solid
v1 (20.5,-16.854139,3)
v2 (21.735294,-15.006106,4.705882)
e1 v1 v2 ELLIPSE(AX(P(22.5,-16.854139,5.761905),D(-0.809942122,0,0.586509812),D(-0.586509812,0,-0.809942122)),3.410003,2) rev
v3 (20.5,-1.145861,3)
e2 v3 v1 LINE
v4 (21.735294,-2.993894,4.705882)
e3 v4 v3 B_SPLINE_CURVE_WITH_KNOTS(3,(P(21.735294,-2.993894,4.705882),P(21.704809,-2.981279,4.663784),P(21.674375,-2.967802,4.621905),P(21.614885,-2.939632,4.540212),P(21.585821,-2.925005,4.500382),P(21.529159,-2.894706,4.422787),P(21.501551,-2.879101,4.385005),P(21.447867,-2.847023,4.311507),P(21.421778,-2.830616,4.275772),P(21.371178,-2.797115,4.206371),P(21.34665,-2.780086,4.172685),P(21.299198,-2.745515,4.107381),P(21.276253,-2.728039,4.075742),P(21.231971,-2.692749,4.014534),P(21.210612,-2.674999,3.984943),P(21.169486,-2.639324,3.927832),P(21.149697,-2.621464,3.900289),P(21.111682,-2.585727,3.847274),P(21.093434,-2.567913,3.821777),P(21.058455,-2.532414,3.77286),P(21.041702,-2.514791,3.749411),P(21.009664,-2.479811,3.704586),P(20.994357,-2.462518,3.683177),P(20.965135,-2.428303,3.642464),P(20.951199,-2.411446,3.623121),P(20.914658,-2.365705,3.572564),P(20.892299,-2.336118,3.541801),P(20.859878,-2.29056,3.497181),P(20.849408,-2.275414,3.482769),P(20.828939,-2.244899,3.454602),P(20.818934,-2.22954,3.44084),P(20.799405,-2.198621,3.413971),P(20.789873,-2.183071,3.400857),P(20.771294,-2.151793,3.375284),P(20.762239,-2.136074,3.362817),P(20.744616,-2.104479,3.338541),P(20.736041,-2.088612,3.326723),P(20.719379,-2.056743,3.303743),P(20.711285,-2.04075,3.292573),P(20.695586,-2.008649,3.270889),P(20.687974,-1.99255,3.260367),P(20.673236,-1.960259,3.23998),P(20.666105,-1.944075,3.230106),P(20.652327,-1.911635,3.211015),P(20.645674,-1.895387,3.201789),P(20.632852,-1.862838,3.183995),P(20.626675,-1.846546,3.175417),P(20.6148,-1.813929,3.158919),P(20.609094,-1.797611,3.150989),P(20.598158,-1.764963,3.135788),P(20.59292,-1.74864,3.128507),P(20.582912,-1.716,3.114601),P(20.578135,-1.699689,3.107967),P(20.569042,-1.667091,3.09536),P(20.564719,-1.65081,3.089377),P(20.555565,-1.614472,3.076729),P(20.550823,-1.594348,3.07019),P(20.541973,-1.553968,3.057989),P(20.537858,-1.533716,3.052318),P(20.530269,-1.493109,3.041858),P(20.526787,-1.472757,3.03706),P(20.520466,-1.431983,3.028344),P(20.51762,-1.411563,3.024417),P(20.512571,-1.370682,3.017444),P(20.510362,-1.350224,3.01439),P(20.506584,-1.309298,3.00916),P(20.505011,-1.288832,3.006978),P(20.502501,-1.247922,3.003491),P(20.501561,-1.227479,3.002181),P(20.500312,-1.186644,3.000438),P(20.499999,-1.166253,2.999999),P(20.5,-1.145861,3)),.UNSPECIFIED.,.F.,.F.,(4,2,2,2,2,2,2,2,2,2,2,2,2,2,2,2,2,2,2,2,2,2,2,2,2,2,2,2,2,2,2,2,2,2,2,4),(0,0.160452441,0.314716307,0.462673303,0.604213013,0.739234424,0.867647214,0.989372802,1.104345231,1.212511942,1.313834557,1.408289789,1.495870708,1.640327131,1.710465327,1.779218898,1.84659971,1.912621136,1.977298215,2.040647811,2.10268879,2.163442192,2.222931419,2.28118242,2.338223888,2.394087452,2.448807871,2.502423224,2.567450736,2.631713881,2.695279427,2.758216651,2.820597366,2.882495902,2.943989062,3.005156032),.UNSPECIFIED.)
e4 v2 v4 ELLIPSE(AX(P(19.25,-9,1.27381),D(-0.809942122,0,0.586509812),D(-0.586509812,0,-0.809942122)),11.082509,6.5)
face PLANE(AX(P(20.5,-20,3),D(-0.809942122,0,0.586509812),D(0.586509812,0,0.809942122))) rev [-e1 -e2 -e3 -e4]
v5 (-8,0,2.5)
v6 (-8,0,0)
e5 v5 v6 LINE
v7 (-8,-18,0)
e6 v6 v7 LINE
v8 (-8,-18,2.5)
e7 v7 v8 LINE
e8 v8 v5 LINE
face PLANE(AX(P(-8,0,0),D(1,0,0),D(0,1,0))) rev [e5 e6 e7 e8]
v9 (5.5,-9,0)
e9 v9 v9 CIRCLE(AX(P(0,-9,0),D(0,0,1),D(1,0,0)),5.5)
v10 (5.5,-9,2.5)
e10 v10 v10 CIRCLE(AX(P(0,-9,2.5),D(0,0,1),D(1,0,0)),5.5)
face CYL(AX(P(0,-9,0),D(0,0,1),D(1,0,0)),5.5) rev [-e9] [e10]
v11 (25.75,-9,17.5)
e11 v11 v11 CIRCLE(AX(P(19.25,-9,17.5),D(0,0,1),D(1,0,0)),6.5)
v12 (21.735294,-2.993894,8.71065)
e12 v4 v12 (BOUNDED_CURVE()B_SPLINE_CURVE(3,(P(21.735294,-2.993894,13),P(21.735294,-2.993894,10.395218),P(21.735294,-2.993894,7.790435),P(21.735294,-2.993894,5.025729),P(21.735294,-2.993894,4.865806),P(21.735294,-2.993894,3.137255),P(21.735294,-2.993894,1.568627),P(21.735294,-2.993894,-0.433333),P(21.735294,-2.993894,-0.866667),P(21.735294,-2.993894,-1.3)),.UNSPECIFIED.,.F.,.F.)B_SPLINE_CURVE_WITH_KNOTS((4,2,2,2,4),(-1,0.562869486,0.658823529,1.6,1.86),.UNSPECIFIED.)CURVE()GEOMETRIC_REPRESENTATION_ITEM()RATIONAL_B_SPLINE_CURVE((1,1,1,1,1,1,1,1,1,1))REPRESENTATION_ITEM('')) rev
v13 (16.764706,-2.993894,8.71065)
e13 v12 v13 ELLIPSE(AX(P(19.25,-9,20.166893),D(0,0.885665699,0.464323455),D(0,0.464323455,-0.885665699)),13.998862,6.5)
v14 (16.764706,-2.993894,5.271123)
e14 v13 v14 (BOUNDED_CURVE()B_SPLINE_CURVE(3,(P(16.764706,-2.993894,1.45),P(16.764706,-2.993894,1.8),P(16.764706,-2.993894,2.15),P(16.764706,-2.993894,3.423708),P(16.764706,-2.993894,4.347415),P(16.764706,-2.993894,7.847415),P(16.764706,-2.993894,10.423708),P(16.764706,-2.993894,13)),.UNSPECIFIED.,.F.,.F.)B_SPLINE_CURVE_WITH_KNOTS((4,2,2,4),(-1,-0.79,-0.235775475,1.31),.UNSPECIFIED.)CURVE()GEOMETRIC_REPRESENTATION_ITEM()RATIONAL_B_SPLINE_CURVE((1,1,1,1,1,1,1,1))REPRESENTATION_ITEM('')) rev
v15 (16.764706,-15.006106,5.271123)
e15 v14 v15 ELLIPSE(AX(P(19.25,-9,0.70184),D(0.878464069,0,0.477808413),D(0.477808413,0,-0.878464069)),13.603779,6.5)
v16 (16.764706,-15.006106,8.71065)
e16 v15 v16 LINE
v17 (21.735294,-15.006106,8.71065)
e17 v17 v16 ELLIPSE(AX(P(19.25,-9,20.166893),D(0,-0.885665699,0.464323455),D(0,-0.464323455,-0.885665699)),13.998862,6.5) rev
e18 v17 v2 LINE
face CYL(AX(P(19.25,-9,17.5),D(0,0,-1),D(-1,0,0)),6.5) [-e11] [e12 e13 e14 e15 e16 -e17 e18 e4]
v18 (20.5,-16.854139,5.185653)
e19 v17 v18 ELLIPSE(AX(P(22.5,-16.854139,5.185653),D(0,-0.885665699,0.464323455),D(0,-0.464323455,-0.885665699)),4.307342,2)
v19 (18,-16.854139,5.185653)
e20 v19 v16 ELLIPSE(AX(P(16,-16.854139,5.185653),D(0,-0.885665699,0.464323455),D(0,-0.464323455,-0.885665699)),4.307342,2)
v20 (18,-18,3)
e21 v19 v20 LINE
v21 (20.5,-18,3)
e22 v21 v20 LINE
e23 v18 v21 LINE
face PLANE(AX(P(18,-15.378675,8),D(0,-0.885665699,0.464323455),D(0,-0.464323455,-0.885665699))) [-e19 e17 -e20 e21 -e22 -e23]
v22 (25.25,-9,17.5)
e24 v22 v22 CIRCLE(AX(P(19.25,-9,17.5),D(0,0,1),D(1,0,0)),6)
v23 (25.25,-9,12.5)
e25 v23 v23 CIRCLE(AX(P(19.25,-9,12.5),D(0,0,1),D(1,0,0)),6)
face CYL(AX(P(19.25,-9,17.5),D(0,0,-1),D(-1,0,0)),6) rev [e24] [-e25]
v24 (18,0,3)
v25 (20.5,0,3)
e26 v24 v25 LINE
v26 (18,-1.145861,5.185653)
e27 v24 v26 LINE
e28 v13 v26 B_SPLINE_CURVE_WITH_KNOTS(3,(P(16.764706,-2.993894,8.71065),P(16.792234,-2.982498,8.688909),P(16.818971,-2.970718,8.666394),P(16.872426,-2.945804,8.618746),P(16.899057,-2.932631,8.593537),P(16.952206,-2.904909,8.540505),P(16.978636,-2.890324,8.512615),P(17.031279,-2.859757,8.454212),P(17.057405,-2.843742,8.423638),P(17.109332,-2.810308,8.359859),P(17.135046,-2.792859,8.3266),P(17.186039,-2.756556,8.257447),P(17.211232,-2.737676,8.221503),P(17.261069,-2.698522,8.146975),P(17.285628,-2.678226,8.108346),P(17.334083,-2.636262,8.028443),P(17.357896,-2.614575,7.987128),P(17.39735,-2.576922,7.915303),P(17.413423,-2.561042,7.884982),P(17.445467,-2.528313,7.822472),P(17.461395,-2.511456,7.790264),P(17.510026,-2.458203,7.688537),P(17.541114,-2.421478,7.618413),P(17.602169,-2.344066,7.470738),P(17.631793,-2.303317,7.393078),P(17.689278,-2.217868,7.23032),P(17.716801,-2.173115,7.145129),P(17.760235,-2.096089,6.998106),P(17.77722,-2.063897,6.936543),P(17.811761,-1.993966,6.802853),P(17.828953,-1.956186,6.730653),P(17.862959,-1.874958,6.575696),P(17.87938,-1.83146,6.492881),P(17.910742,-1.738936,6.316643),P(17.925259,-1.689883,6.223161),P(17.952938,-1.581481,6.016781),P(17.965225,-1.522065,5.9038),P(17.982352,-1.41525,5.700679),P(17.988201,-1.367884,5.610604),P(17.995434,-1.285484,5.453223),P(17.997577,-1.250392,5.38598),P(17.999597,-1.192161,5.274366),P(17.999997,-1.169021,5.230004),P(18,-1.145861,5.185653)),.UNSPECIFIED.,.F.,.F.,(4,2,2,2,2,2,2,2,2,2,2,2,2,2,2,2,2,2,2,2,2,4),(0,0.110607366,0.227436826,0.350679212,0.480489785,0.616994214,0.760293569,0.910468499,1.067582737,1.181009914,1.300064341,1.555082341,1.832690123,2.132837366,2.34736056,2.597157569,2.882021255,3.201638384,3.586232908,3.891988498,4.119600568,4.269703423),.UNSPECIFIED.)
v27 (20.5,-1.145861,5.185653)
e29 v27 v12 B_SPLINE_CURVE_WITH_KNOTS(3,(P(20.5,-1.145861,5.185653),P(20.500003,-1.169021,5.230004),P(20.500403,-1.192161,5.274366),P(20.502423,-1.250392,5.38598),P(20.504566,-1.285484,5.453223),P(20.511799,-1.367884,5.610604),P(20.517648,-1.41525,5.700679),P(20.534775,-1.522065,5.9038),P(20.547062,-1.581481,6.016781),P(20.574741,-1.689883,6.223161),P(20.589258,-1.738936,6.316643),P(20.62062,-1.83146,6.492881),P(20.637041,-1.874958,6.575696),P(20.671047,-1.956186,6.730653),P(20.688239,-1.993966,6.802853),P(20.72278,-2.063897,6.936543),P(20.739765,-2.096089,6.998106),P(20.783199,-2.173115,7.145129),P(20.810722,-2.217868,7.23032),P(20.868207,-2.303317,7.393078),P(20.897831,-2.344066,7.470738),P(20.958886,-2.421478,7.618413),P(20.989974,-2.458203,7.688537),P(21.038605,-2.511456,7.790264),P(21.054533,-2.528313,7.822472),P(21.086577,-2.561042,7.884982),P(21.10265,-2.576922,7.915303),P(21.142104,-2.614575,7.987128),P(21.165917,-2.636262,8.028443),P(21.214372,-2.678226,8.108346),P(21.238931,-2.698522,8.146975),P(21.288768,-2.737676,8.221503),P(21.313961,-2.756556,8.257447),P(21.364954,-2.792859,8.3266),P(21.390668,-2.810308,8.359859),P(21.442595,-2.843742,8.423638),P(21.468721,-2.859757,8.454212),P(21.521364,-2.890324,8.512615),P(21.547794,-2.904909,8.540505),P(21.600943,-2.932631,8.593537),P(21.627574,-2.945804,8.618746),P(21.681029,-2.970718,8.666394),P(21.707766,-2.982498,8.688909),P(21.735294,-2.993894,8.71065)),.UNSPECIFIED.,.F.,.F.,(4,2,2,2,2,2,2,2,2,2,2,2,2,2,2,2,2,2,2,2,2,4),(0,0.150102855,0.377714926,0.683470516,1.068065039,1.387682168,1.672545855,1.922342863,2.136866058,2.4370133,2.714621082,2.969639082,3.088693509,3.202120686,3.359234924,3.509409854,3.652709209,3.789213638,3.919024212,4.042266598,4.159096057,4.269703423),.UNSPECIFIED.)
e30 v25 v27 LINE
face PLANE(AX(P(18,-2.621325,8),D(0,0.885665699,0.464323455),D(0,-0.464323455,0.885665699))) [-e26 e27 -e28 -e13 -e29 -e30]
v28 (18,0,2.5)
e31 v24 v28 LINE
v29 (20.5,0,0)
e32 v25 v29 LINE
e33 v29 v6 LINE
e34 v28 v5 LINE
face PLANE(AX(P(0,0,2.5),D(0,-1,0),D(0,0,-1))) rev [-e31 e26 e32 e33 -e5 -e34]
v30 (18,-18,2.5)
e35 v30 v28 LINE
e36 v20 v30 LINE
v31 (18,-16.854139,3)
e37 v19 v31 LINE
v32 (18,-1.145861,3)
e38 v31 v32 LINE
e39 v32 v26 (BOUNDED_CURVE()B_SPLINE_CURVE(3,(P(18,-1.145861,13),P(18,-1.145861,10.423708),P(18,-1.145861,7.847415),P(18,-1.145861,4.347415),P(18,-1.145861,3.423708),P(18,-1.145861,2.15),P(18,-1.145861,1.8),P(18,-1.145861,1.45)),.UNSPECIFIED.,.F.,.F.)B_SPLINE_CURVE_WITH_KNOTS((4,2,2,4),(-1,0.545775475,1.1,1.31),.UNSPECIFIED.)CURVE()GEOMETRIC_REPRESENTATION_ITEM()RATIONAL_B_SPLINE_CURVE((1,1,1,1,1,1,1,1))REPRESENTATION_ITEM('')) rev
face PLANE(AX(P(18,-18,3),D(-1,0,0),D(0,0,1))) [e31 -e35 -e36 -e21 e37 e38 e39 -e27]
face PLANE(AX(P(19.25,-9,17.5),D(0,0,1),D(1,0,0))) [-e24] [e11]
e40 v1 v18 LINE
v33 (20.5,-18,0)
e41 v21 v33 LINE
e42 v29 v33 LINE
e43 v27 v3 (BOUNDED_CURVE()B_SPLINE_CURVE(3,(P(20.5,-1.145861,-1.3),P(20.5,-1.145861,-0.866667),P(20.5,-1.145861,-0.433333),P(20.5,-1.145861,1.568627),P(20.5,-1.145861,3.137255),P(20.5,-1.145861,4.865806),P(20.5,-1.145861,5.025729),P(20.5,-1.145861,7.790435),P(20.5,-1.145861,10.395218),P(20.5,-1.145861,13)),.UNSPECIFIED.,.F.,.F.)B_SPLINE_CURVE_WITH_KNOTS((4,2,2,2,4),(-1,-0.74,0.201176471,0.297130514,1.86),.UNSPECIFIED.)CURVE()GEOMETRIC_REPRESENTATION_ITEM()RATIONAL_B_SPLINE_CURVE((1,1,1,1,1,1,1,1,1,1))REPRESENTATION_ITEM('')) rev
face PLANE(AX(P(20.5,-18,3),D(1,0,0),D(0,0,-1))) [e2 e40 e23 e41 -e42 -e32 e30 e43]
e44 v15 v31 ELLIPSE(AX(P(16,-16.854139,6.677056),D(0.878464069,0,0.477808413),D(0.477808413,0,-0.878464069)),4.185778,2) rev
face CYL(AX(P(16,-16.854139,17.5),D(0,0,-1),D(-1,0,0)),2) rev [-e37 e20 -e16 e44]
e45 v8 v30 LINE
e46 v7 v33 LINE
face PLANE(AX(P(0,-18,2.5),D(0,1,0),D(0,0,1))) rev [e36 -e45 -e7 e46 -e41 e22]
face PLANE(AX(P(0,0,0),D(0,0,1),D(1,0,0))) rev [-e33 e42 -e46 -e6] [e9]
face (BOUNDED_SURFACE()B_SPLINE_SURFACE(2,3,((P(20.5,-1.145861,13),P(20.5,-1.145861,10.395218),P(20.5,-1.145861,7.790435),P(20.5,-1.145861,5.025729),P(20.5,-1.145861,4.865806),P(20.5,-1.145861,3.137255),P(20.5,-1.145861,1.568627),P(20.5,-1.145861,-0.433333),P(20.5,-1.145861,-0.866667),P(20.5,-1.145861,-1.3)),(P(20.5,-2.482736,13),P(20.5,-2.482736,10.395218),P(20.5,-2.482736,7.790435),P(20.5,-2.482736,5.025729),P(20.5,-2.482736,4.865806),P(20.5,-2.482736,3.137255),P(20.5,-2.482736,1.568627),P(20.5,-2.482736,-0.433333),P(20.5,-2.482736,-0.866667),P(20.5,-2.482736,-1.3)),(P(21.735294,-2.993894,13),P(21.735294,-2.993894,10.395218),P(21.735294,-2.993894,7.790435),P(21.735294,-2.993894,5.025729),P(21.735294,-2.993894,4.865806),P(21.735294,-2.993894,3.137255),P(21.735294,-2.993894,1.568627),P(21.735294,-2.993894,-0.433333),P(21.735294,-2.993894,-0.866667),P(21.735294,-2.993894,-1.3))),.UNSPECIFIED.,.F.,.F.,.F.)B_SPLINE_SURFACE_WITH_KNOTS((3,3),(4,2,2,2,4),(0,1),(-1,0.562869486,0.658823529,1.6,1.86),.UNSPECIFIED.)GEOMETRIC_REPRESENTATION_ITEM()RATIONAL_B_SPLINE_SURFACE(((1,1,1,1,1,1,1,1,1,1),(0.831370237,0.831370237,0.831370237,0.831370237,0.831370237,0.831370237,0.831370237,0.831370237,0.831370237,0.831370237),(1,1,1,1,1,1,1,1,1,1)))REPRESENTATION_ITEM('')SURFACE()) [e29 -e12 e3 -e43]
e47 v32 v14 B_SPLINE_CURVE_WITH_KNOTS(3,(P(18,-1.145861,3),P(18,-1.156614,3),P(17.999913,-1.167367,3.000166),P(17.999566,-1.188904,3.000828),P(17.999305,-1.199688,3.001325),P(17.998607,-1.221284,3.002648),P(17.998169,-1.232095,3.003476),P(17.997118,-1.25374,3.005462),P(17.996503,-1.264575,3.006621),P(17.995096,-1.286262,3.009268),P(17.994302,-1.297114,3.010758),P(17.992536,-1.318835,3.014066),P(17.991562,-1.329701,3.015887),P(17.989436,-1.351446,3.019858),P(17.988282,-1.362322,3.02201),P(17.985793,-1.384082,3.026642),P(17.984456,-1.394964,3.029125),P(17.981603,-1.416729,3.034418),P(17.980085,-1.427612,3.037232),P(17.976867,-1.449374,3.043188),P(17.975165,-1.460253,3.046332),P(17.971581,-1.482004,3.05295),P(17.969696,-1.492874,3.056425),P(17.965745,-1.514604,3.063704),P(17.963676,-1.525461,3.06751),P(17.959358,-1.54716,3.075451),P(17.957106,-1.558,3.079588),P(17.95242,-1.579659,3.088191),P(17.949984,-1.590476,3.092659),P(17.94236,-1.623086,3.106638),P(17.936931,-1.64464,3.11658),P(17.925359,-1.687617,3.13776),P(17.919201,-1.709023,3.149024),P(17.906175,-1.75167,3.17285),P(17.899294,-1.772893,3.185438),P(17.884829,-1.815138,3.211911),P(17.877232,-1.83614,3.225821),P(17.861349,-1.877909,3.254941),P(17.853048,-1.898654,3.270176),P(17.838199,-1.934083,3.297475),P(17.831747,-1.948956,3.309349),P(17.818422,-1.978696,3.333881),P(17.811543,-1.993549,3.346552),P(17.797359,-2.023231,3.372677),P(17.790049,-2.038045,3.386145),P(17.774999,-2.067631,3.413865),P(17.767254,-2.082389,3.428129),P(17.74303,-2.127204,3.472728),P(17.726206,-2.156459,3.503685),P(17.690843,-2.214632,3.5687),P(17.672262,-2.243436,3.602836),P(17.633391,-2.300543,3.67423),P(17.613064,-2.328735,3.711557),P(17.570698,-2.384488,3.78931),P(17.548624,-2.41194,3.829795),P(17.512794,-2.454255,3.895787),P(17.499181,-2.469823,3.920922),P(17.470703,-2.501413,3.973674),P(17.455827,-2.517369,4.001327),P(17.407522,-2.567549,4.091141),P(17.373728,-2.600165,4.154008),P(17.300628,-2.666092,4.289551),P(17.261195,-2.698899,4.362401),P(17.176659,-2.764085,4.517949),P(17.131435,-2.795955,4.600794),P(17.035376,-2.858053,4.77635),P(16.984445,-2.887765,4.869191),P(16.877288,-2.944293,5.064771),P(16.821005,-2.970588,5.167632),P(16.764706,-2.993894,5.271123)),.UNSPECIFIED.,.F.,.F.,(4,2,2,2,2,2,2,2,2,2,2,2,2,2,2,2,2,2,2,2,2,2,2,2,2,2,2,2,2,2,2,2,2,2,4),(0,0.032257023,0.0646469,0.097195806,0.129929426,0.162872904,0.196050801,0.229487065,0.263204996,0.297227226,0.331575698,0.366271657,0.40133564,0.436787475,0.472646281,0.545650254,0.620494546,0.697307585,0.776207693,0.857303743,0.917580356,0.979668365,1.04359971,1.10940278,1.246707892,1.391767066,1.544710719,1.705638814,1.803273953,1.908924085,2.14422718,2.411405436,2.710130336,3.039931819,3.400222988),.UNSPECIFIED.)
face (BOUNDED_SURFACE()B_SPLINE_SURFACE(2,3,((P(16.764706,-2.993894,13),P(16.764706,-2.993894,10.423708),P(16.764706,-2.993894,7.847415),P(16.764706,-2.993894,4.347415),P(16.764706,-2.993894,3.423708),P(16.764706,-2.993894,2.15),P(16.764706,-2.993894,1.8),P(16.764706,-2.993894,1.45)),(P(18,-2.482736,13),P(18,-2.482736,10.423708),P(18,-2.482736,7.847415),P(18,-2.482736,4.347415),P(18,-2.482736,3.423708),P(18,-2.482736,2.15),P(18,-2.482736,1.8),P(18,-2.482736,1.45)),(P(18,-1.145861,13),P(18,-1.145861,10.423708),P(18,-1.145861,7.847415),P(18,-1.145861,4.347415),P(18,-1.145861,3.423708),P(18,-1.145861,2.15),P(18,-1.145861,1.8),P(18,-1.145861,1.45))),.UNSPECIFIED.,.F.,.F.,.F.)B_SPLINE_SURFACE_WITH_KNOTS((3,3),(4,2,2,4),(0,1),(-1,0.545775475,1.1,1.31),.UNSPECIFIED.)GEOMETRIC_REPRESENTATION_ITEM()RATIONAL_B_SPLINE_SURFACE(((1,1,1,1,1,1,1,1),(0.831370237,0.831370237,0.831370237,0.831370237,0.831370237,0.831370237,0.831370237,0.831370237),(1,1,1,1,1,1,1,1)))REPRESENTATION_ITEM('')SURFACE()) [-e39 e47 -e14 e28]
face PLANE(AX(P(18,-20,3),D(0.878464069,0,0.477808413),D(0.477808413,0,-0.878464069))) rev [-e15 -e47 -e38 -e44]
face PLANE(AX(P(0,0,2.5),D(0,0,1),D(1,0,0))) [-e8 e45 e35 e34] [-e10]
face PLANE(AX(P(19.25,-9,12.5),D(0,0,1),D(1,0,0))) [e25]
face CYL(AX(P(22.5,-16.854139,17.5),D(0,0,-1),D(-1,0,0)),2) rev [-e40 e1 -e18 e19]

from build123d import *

# Parameters (mm, degrees)
SZKIC1_W                     = 18
SZKIC1_H                     = 18
DODANIE_WYCI_GNI_CIE1_DEPTH  = 2.5
SZKIC3_R                     = 6.5
SZKIC3_R_2                   = 6
DODANIE_WYCI_GNI_CIE2_DEPTH  = 5
SZKIC5_R                     = 6.5
DODANIE_WYCI_GNI_CIE3_DEPTH  = 9.5
SZKIC6_W                     = 2.5
SZKIC6_H                     = 18
DODANIE_WYCI_GNI_CIE4_DEPTH  = 3
WYTNIJ_WYCI_GNI_CIE3_DEPTH   = 20
DODANIE_WYCI_GNI_CIE11_DEPTH = 2.5
ZAOKR_GLENIE3_R              = 2
ZAOKR_GLENIE4_R              = 2
ZAOKR_GLENIE5_R              = 2
ZAOKR_GLENIE6_R              = 2
SZKIC21_W                    = 2.5
SZKIC21_H                    = 18
DODANIE_WYCI_GNI_CIE12_DEPTH = 8
SZKIC23_R                    = 5.5
WYTNIJ_WYCI_GNI_CIE4_DEPTH   = 2.5


with BuildPart() as part:
    # Szkic1 → Dodanie-wyciągnięcie1 (new body)
    with BuildSketch(Plane.XY):
        with Locations((9, -9)):
            Rectangle(SZKIC1_W, SZKIC1_H)
    extrude(amount=DODANIE_WYCI_GNI_CIE1_DEPTH)

    # Szkic6 → Dodanie-wyciągnięcie4 (add)
    with BuildSketch(Plane(origin=(0, 0, 0), x_dir=(-1, 0, 0), z_dir=(0, 0, -1))):
        with Locations((-19.25, -9)):
            Rectangle(SZKIC6_W, SZKIC6_H)
    extrude(amount=-DODANIE_WYCI_GNI_CIE4_DEPTH)



with BuildPart() as body_2:
    # Szkic3 → Dodanie-wyciągnięcie2 (new body)
    with BuildSketch(Plane.XY.offset(12.5)):
        with Locations((19.25, -9)):
            Circle(SZKIC3_R)
        with Locations((19.25, -9)):
            Circle(SZKIC3_R_2, mode=Mode.SUBTRACT)
    extrude(amount=DODANIE_WYCI_GNI_CIE2_DEPTH)

    # Szkic5 → Dodanie-wyciągnięcie3 (add)
    with BuildSketch(Plane.XY.offset(12.5)):
        with Locations((19.25, -9)):
            Circle(SZKIC5_R)
    extrude(amount=-DODANIE_WYCI_GNI_CIE3_DEPTH)

    # Szkic17 → Wytnij-wyciągnięcie3 (cut)
    with BuildSketch(Plane(origin=(0, 0, 0), x_dir=(1, 0, 0), z_dir=(0, 1, 0))):
        Polygon((20.5, -3), (25.75, -10.25), (25.75, -3), align=None)
        Polygon((18, -3), (12.696843968, -12.75), (12.75, -3), align=None)
    extrude(amount=-WYTNIJ_WYCI_GNI_CIE3_DEPTH, mode=Mode.SUBTRACT)


with BuildPart() as part_1:
    add(part.part)

    add(body_2.part)  # Dodanie-wyciągnięcie11 merges body 2
    # Szkic19 → Dodanie-wyciągnięcie11 (add)
    with BuildSketch(Plane(origin=(20.5, 0, 0), x_dir=(0, 0, -1), z_dir=(1, 0, 0))):
        Polygon((-3, -18), (-3, -15.378675411), (-8, -15.378675411), align=None)
        Polygon((-3, 0), (-3, -2.621324589), (-8, -2.621324589), align=None)
    extrude(amount=-DODANIE_WYCI_GNI_CIE11_DEPTH)

    # Zaokrąglenie3
    zaokr_glenie3_edges = [part_1.edges().sort_by_distance(p)[0] for p in [
        (20.5, -15.378675411, 5.5),
    ]]
    fillet(zaokr_glenie3_edges, radius=ZAOKR_GLENIE3_R)

    # Zaokrąglenie4
    zaokr_glenie4_edges = [part_1.edges().sort_by_distance(p)[0] for p in [
        (20.5, -2.621324589, 5.5),
    ]]
    fillet(zaokr_glenie4_edges, radius=ZAOKR_GLENIE4_R)

    # Zaokrąglenie5
    # the kernel refuses this fillet: 2 mm, written as the material it adds along each edge
    with BuildSketch(Plane(origin=(18, -15.378675411, -0.688659063), x_dir=(0, -1, 0), z_dir=(0, 0, 1))) as zaokr_glenie5_piece_1_section:
        with BuildLine():
            CenterArc((1.475463625, -2), ZAOKR_GLENIE5_R, 90, 67.520494391)
            ThreePointArc((-0.372569089, -1.235294118), (-0.155557822, -0.626914348), (0, 0))
            Line((0, 0), (1.475463625, 0))
        make_face()
    zaokr_glenie5_piece_1 = extrude(amount=12.377318126, mode=Mode.PRIVATE)
    zaokr_glenie5_piece_1 = split(zaokr_glenie5_piece_1, bisect_by=Plane(origin=(16.879667194, -15.616046578, 5.059763053), z_dir=(0.878464068971863, 0, 0.47780841299143956)), keep=Keep.TOP, mode=Mode.PRIVATE)
    zaokr_glenie5_piece_1 = split(zaokr_glenie5_piece_1, bisect_by=Plane(origin=(17.729689725, -16.448851128, 5.958711939), z_dir=(0, 0.8856656985010092, -0.46432345460758234)), keep=Keep.TOP, mode=Mode.PRIVATE)
    add(zaokr_glenie5_piece_1)

    # Zaokrąglenie6
    # the kernel refuses this fillet: 2 mm, written as the material it adds along each edge
    with BuildSketch(Plane(origin=(18, -2.621324589, -0.688659063), x_dir=(0, 1, 0), z_dir=(0, 0, 1))) as zaokr_glenie6_piece_1_section:
        with BuildLine():
            CenterArc((1.475463625, 2), ZAOKR_GLENIE6_R, 202.479505609, 67.520494391)
            ThreePointArc((-0.372569089, 1.235294118), (-0.155557822, 0.626914348), (0, 0))
            Line((0, 0), (1.475463625, 0))
        make_face()
    zaokr_glenie6_piece_1 = extrude(amount=12.377318126, mode=Mode.PRIVATE)
    zaokr_glenie6_piece_1 = split(zaokr_glenie6_piece_1, bisect_by=Plane(origin=(17.729689725, -1.551148872, 5.958711939), z_dir=(0, -0.8856656985010092, -0.4643234546075823)), keep=Keep.TOP, mode=Mode.PRIVATE)
    zaokr_glenie6_piece_1 = split(zaokr_glenie6_piece_1, bisect_by=Plane(origin=(16.879667194, -2.383953422, 5.059763053), z_dir=(0.8784640689720787, 0, 0.4778084129910428)), keep=Keep.TOP, mode=Mode.PRIVATE)
    add(zaokr_glenie6_piece_1)

    # Szkic21 → Dodanie-wyciągnięcie12 (add)
    with BuildSketch(Plane.ZY):
        with Locations((1.25, -9)):
            Rectangle(SZKIC21_W, SZKIC21_H)
    extrude(amount=DODANIE_WYCI_GNI_CIE12_DEPTH)

    # Szkic23 → Wytnij-wyciągnięcie4 (cut)
    with BuildSketch(Plane.XY.offset(2.5)):
        with Locations((0, -9)):
            Circle(SZKIC23_R)
    extrude(amount=-WYTNIJ_WYCI_GNI_CIE4_DEPTH, mode=Mode.SUBTRACT)


solid = part_1.part
